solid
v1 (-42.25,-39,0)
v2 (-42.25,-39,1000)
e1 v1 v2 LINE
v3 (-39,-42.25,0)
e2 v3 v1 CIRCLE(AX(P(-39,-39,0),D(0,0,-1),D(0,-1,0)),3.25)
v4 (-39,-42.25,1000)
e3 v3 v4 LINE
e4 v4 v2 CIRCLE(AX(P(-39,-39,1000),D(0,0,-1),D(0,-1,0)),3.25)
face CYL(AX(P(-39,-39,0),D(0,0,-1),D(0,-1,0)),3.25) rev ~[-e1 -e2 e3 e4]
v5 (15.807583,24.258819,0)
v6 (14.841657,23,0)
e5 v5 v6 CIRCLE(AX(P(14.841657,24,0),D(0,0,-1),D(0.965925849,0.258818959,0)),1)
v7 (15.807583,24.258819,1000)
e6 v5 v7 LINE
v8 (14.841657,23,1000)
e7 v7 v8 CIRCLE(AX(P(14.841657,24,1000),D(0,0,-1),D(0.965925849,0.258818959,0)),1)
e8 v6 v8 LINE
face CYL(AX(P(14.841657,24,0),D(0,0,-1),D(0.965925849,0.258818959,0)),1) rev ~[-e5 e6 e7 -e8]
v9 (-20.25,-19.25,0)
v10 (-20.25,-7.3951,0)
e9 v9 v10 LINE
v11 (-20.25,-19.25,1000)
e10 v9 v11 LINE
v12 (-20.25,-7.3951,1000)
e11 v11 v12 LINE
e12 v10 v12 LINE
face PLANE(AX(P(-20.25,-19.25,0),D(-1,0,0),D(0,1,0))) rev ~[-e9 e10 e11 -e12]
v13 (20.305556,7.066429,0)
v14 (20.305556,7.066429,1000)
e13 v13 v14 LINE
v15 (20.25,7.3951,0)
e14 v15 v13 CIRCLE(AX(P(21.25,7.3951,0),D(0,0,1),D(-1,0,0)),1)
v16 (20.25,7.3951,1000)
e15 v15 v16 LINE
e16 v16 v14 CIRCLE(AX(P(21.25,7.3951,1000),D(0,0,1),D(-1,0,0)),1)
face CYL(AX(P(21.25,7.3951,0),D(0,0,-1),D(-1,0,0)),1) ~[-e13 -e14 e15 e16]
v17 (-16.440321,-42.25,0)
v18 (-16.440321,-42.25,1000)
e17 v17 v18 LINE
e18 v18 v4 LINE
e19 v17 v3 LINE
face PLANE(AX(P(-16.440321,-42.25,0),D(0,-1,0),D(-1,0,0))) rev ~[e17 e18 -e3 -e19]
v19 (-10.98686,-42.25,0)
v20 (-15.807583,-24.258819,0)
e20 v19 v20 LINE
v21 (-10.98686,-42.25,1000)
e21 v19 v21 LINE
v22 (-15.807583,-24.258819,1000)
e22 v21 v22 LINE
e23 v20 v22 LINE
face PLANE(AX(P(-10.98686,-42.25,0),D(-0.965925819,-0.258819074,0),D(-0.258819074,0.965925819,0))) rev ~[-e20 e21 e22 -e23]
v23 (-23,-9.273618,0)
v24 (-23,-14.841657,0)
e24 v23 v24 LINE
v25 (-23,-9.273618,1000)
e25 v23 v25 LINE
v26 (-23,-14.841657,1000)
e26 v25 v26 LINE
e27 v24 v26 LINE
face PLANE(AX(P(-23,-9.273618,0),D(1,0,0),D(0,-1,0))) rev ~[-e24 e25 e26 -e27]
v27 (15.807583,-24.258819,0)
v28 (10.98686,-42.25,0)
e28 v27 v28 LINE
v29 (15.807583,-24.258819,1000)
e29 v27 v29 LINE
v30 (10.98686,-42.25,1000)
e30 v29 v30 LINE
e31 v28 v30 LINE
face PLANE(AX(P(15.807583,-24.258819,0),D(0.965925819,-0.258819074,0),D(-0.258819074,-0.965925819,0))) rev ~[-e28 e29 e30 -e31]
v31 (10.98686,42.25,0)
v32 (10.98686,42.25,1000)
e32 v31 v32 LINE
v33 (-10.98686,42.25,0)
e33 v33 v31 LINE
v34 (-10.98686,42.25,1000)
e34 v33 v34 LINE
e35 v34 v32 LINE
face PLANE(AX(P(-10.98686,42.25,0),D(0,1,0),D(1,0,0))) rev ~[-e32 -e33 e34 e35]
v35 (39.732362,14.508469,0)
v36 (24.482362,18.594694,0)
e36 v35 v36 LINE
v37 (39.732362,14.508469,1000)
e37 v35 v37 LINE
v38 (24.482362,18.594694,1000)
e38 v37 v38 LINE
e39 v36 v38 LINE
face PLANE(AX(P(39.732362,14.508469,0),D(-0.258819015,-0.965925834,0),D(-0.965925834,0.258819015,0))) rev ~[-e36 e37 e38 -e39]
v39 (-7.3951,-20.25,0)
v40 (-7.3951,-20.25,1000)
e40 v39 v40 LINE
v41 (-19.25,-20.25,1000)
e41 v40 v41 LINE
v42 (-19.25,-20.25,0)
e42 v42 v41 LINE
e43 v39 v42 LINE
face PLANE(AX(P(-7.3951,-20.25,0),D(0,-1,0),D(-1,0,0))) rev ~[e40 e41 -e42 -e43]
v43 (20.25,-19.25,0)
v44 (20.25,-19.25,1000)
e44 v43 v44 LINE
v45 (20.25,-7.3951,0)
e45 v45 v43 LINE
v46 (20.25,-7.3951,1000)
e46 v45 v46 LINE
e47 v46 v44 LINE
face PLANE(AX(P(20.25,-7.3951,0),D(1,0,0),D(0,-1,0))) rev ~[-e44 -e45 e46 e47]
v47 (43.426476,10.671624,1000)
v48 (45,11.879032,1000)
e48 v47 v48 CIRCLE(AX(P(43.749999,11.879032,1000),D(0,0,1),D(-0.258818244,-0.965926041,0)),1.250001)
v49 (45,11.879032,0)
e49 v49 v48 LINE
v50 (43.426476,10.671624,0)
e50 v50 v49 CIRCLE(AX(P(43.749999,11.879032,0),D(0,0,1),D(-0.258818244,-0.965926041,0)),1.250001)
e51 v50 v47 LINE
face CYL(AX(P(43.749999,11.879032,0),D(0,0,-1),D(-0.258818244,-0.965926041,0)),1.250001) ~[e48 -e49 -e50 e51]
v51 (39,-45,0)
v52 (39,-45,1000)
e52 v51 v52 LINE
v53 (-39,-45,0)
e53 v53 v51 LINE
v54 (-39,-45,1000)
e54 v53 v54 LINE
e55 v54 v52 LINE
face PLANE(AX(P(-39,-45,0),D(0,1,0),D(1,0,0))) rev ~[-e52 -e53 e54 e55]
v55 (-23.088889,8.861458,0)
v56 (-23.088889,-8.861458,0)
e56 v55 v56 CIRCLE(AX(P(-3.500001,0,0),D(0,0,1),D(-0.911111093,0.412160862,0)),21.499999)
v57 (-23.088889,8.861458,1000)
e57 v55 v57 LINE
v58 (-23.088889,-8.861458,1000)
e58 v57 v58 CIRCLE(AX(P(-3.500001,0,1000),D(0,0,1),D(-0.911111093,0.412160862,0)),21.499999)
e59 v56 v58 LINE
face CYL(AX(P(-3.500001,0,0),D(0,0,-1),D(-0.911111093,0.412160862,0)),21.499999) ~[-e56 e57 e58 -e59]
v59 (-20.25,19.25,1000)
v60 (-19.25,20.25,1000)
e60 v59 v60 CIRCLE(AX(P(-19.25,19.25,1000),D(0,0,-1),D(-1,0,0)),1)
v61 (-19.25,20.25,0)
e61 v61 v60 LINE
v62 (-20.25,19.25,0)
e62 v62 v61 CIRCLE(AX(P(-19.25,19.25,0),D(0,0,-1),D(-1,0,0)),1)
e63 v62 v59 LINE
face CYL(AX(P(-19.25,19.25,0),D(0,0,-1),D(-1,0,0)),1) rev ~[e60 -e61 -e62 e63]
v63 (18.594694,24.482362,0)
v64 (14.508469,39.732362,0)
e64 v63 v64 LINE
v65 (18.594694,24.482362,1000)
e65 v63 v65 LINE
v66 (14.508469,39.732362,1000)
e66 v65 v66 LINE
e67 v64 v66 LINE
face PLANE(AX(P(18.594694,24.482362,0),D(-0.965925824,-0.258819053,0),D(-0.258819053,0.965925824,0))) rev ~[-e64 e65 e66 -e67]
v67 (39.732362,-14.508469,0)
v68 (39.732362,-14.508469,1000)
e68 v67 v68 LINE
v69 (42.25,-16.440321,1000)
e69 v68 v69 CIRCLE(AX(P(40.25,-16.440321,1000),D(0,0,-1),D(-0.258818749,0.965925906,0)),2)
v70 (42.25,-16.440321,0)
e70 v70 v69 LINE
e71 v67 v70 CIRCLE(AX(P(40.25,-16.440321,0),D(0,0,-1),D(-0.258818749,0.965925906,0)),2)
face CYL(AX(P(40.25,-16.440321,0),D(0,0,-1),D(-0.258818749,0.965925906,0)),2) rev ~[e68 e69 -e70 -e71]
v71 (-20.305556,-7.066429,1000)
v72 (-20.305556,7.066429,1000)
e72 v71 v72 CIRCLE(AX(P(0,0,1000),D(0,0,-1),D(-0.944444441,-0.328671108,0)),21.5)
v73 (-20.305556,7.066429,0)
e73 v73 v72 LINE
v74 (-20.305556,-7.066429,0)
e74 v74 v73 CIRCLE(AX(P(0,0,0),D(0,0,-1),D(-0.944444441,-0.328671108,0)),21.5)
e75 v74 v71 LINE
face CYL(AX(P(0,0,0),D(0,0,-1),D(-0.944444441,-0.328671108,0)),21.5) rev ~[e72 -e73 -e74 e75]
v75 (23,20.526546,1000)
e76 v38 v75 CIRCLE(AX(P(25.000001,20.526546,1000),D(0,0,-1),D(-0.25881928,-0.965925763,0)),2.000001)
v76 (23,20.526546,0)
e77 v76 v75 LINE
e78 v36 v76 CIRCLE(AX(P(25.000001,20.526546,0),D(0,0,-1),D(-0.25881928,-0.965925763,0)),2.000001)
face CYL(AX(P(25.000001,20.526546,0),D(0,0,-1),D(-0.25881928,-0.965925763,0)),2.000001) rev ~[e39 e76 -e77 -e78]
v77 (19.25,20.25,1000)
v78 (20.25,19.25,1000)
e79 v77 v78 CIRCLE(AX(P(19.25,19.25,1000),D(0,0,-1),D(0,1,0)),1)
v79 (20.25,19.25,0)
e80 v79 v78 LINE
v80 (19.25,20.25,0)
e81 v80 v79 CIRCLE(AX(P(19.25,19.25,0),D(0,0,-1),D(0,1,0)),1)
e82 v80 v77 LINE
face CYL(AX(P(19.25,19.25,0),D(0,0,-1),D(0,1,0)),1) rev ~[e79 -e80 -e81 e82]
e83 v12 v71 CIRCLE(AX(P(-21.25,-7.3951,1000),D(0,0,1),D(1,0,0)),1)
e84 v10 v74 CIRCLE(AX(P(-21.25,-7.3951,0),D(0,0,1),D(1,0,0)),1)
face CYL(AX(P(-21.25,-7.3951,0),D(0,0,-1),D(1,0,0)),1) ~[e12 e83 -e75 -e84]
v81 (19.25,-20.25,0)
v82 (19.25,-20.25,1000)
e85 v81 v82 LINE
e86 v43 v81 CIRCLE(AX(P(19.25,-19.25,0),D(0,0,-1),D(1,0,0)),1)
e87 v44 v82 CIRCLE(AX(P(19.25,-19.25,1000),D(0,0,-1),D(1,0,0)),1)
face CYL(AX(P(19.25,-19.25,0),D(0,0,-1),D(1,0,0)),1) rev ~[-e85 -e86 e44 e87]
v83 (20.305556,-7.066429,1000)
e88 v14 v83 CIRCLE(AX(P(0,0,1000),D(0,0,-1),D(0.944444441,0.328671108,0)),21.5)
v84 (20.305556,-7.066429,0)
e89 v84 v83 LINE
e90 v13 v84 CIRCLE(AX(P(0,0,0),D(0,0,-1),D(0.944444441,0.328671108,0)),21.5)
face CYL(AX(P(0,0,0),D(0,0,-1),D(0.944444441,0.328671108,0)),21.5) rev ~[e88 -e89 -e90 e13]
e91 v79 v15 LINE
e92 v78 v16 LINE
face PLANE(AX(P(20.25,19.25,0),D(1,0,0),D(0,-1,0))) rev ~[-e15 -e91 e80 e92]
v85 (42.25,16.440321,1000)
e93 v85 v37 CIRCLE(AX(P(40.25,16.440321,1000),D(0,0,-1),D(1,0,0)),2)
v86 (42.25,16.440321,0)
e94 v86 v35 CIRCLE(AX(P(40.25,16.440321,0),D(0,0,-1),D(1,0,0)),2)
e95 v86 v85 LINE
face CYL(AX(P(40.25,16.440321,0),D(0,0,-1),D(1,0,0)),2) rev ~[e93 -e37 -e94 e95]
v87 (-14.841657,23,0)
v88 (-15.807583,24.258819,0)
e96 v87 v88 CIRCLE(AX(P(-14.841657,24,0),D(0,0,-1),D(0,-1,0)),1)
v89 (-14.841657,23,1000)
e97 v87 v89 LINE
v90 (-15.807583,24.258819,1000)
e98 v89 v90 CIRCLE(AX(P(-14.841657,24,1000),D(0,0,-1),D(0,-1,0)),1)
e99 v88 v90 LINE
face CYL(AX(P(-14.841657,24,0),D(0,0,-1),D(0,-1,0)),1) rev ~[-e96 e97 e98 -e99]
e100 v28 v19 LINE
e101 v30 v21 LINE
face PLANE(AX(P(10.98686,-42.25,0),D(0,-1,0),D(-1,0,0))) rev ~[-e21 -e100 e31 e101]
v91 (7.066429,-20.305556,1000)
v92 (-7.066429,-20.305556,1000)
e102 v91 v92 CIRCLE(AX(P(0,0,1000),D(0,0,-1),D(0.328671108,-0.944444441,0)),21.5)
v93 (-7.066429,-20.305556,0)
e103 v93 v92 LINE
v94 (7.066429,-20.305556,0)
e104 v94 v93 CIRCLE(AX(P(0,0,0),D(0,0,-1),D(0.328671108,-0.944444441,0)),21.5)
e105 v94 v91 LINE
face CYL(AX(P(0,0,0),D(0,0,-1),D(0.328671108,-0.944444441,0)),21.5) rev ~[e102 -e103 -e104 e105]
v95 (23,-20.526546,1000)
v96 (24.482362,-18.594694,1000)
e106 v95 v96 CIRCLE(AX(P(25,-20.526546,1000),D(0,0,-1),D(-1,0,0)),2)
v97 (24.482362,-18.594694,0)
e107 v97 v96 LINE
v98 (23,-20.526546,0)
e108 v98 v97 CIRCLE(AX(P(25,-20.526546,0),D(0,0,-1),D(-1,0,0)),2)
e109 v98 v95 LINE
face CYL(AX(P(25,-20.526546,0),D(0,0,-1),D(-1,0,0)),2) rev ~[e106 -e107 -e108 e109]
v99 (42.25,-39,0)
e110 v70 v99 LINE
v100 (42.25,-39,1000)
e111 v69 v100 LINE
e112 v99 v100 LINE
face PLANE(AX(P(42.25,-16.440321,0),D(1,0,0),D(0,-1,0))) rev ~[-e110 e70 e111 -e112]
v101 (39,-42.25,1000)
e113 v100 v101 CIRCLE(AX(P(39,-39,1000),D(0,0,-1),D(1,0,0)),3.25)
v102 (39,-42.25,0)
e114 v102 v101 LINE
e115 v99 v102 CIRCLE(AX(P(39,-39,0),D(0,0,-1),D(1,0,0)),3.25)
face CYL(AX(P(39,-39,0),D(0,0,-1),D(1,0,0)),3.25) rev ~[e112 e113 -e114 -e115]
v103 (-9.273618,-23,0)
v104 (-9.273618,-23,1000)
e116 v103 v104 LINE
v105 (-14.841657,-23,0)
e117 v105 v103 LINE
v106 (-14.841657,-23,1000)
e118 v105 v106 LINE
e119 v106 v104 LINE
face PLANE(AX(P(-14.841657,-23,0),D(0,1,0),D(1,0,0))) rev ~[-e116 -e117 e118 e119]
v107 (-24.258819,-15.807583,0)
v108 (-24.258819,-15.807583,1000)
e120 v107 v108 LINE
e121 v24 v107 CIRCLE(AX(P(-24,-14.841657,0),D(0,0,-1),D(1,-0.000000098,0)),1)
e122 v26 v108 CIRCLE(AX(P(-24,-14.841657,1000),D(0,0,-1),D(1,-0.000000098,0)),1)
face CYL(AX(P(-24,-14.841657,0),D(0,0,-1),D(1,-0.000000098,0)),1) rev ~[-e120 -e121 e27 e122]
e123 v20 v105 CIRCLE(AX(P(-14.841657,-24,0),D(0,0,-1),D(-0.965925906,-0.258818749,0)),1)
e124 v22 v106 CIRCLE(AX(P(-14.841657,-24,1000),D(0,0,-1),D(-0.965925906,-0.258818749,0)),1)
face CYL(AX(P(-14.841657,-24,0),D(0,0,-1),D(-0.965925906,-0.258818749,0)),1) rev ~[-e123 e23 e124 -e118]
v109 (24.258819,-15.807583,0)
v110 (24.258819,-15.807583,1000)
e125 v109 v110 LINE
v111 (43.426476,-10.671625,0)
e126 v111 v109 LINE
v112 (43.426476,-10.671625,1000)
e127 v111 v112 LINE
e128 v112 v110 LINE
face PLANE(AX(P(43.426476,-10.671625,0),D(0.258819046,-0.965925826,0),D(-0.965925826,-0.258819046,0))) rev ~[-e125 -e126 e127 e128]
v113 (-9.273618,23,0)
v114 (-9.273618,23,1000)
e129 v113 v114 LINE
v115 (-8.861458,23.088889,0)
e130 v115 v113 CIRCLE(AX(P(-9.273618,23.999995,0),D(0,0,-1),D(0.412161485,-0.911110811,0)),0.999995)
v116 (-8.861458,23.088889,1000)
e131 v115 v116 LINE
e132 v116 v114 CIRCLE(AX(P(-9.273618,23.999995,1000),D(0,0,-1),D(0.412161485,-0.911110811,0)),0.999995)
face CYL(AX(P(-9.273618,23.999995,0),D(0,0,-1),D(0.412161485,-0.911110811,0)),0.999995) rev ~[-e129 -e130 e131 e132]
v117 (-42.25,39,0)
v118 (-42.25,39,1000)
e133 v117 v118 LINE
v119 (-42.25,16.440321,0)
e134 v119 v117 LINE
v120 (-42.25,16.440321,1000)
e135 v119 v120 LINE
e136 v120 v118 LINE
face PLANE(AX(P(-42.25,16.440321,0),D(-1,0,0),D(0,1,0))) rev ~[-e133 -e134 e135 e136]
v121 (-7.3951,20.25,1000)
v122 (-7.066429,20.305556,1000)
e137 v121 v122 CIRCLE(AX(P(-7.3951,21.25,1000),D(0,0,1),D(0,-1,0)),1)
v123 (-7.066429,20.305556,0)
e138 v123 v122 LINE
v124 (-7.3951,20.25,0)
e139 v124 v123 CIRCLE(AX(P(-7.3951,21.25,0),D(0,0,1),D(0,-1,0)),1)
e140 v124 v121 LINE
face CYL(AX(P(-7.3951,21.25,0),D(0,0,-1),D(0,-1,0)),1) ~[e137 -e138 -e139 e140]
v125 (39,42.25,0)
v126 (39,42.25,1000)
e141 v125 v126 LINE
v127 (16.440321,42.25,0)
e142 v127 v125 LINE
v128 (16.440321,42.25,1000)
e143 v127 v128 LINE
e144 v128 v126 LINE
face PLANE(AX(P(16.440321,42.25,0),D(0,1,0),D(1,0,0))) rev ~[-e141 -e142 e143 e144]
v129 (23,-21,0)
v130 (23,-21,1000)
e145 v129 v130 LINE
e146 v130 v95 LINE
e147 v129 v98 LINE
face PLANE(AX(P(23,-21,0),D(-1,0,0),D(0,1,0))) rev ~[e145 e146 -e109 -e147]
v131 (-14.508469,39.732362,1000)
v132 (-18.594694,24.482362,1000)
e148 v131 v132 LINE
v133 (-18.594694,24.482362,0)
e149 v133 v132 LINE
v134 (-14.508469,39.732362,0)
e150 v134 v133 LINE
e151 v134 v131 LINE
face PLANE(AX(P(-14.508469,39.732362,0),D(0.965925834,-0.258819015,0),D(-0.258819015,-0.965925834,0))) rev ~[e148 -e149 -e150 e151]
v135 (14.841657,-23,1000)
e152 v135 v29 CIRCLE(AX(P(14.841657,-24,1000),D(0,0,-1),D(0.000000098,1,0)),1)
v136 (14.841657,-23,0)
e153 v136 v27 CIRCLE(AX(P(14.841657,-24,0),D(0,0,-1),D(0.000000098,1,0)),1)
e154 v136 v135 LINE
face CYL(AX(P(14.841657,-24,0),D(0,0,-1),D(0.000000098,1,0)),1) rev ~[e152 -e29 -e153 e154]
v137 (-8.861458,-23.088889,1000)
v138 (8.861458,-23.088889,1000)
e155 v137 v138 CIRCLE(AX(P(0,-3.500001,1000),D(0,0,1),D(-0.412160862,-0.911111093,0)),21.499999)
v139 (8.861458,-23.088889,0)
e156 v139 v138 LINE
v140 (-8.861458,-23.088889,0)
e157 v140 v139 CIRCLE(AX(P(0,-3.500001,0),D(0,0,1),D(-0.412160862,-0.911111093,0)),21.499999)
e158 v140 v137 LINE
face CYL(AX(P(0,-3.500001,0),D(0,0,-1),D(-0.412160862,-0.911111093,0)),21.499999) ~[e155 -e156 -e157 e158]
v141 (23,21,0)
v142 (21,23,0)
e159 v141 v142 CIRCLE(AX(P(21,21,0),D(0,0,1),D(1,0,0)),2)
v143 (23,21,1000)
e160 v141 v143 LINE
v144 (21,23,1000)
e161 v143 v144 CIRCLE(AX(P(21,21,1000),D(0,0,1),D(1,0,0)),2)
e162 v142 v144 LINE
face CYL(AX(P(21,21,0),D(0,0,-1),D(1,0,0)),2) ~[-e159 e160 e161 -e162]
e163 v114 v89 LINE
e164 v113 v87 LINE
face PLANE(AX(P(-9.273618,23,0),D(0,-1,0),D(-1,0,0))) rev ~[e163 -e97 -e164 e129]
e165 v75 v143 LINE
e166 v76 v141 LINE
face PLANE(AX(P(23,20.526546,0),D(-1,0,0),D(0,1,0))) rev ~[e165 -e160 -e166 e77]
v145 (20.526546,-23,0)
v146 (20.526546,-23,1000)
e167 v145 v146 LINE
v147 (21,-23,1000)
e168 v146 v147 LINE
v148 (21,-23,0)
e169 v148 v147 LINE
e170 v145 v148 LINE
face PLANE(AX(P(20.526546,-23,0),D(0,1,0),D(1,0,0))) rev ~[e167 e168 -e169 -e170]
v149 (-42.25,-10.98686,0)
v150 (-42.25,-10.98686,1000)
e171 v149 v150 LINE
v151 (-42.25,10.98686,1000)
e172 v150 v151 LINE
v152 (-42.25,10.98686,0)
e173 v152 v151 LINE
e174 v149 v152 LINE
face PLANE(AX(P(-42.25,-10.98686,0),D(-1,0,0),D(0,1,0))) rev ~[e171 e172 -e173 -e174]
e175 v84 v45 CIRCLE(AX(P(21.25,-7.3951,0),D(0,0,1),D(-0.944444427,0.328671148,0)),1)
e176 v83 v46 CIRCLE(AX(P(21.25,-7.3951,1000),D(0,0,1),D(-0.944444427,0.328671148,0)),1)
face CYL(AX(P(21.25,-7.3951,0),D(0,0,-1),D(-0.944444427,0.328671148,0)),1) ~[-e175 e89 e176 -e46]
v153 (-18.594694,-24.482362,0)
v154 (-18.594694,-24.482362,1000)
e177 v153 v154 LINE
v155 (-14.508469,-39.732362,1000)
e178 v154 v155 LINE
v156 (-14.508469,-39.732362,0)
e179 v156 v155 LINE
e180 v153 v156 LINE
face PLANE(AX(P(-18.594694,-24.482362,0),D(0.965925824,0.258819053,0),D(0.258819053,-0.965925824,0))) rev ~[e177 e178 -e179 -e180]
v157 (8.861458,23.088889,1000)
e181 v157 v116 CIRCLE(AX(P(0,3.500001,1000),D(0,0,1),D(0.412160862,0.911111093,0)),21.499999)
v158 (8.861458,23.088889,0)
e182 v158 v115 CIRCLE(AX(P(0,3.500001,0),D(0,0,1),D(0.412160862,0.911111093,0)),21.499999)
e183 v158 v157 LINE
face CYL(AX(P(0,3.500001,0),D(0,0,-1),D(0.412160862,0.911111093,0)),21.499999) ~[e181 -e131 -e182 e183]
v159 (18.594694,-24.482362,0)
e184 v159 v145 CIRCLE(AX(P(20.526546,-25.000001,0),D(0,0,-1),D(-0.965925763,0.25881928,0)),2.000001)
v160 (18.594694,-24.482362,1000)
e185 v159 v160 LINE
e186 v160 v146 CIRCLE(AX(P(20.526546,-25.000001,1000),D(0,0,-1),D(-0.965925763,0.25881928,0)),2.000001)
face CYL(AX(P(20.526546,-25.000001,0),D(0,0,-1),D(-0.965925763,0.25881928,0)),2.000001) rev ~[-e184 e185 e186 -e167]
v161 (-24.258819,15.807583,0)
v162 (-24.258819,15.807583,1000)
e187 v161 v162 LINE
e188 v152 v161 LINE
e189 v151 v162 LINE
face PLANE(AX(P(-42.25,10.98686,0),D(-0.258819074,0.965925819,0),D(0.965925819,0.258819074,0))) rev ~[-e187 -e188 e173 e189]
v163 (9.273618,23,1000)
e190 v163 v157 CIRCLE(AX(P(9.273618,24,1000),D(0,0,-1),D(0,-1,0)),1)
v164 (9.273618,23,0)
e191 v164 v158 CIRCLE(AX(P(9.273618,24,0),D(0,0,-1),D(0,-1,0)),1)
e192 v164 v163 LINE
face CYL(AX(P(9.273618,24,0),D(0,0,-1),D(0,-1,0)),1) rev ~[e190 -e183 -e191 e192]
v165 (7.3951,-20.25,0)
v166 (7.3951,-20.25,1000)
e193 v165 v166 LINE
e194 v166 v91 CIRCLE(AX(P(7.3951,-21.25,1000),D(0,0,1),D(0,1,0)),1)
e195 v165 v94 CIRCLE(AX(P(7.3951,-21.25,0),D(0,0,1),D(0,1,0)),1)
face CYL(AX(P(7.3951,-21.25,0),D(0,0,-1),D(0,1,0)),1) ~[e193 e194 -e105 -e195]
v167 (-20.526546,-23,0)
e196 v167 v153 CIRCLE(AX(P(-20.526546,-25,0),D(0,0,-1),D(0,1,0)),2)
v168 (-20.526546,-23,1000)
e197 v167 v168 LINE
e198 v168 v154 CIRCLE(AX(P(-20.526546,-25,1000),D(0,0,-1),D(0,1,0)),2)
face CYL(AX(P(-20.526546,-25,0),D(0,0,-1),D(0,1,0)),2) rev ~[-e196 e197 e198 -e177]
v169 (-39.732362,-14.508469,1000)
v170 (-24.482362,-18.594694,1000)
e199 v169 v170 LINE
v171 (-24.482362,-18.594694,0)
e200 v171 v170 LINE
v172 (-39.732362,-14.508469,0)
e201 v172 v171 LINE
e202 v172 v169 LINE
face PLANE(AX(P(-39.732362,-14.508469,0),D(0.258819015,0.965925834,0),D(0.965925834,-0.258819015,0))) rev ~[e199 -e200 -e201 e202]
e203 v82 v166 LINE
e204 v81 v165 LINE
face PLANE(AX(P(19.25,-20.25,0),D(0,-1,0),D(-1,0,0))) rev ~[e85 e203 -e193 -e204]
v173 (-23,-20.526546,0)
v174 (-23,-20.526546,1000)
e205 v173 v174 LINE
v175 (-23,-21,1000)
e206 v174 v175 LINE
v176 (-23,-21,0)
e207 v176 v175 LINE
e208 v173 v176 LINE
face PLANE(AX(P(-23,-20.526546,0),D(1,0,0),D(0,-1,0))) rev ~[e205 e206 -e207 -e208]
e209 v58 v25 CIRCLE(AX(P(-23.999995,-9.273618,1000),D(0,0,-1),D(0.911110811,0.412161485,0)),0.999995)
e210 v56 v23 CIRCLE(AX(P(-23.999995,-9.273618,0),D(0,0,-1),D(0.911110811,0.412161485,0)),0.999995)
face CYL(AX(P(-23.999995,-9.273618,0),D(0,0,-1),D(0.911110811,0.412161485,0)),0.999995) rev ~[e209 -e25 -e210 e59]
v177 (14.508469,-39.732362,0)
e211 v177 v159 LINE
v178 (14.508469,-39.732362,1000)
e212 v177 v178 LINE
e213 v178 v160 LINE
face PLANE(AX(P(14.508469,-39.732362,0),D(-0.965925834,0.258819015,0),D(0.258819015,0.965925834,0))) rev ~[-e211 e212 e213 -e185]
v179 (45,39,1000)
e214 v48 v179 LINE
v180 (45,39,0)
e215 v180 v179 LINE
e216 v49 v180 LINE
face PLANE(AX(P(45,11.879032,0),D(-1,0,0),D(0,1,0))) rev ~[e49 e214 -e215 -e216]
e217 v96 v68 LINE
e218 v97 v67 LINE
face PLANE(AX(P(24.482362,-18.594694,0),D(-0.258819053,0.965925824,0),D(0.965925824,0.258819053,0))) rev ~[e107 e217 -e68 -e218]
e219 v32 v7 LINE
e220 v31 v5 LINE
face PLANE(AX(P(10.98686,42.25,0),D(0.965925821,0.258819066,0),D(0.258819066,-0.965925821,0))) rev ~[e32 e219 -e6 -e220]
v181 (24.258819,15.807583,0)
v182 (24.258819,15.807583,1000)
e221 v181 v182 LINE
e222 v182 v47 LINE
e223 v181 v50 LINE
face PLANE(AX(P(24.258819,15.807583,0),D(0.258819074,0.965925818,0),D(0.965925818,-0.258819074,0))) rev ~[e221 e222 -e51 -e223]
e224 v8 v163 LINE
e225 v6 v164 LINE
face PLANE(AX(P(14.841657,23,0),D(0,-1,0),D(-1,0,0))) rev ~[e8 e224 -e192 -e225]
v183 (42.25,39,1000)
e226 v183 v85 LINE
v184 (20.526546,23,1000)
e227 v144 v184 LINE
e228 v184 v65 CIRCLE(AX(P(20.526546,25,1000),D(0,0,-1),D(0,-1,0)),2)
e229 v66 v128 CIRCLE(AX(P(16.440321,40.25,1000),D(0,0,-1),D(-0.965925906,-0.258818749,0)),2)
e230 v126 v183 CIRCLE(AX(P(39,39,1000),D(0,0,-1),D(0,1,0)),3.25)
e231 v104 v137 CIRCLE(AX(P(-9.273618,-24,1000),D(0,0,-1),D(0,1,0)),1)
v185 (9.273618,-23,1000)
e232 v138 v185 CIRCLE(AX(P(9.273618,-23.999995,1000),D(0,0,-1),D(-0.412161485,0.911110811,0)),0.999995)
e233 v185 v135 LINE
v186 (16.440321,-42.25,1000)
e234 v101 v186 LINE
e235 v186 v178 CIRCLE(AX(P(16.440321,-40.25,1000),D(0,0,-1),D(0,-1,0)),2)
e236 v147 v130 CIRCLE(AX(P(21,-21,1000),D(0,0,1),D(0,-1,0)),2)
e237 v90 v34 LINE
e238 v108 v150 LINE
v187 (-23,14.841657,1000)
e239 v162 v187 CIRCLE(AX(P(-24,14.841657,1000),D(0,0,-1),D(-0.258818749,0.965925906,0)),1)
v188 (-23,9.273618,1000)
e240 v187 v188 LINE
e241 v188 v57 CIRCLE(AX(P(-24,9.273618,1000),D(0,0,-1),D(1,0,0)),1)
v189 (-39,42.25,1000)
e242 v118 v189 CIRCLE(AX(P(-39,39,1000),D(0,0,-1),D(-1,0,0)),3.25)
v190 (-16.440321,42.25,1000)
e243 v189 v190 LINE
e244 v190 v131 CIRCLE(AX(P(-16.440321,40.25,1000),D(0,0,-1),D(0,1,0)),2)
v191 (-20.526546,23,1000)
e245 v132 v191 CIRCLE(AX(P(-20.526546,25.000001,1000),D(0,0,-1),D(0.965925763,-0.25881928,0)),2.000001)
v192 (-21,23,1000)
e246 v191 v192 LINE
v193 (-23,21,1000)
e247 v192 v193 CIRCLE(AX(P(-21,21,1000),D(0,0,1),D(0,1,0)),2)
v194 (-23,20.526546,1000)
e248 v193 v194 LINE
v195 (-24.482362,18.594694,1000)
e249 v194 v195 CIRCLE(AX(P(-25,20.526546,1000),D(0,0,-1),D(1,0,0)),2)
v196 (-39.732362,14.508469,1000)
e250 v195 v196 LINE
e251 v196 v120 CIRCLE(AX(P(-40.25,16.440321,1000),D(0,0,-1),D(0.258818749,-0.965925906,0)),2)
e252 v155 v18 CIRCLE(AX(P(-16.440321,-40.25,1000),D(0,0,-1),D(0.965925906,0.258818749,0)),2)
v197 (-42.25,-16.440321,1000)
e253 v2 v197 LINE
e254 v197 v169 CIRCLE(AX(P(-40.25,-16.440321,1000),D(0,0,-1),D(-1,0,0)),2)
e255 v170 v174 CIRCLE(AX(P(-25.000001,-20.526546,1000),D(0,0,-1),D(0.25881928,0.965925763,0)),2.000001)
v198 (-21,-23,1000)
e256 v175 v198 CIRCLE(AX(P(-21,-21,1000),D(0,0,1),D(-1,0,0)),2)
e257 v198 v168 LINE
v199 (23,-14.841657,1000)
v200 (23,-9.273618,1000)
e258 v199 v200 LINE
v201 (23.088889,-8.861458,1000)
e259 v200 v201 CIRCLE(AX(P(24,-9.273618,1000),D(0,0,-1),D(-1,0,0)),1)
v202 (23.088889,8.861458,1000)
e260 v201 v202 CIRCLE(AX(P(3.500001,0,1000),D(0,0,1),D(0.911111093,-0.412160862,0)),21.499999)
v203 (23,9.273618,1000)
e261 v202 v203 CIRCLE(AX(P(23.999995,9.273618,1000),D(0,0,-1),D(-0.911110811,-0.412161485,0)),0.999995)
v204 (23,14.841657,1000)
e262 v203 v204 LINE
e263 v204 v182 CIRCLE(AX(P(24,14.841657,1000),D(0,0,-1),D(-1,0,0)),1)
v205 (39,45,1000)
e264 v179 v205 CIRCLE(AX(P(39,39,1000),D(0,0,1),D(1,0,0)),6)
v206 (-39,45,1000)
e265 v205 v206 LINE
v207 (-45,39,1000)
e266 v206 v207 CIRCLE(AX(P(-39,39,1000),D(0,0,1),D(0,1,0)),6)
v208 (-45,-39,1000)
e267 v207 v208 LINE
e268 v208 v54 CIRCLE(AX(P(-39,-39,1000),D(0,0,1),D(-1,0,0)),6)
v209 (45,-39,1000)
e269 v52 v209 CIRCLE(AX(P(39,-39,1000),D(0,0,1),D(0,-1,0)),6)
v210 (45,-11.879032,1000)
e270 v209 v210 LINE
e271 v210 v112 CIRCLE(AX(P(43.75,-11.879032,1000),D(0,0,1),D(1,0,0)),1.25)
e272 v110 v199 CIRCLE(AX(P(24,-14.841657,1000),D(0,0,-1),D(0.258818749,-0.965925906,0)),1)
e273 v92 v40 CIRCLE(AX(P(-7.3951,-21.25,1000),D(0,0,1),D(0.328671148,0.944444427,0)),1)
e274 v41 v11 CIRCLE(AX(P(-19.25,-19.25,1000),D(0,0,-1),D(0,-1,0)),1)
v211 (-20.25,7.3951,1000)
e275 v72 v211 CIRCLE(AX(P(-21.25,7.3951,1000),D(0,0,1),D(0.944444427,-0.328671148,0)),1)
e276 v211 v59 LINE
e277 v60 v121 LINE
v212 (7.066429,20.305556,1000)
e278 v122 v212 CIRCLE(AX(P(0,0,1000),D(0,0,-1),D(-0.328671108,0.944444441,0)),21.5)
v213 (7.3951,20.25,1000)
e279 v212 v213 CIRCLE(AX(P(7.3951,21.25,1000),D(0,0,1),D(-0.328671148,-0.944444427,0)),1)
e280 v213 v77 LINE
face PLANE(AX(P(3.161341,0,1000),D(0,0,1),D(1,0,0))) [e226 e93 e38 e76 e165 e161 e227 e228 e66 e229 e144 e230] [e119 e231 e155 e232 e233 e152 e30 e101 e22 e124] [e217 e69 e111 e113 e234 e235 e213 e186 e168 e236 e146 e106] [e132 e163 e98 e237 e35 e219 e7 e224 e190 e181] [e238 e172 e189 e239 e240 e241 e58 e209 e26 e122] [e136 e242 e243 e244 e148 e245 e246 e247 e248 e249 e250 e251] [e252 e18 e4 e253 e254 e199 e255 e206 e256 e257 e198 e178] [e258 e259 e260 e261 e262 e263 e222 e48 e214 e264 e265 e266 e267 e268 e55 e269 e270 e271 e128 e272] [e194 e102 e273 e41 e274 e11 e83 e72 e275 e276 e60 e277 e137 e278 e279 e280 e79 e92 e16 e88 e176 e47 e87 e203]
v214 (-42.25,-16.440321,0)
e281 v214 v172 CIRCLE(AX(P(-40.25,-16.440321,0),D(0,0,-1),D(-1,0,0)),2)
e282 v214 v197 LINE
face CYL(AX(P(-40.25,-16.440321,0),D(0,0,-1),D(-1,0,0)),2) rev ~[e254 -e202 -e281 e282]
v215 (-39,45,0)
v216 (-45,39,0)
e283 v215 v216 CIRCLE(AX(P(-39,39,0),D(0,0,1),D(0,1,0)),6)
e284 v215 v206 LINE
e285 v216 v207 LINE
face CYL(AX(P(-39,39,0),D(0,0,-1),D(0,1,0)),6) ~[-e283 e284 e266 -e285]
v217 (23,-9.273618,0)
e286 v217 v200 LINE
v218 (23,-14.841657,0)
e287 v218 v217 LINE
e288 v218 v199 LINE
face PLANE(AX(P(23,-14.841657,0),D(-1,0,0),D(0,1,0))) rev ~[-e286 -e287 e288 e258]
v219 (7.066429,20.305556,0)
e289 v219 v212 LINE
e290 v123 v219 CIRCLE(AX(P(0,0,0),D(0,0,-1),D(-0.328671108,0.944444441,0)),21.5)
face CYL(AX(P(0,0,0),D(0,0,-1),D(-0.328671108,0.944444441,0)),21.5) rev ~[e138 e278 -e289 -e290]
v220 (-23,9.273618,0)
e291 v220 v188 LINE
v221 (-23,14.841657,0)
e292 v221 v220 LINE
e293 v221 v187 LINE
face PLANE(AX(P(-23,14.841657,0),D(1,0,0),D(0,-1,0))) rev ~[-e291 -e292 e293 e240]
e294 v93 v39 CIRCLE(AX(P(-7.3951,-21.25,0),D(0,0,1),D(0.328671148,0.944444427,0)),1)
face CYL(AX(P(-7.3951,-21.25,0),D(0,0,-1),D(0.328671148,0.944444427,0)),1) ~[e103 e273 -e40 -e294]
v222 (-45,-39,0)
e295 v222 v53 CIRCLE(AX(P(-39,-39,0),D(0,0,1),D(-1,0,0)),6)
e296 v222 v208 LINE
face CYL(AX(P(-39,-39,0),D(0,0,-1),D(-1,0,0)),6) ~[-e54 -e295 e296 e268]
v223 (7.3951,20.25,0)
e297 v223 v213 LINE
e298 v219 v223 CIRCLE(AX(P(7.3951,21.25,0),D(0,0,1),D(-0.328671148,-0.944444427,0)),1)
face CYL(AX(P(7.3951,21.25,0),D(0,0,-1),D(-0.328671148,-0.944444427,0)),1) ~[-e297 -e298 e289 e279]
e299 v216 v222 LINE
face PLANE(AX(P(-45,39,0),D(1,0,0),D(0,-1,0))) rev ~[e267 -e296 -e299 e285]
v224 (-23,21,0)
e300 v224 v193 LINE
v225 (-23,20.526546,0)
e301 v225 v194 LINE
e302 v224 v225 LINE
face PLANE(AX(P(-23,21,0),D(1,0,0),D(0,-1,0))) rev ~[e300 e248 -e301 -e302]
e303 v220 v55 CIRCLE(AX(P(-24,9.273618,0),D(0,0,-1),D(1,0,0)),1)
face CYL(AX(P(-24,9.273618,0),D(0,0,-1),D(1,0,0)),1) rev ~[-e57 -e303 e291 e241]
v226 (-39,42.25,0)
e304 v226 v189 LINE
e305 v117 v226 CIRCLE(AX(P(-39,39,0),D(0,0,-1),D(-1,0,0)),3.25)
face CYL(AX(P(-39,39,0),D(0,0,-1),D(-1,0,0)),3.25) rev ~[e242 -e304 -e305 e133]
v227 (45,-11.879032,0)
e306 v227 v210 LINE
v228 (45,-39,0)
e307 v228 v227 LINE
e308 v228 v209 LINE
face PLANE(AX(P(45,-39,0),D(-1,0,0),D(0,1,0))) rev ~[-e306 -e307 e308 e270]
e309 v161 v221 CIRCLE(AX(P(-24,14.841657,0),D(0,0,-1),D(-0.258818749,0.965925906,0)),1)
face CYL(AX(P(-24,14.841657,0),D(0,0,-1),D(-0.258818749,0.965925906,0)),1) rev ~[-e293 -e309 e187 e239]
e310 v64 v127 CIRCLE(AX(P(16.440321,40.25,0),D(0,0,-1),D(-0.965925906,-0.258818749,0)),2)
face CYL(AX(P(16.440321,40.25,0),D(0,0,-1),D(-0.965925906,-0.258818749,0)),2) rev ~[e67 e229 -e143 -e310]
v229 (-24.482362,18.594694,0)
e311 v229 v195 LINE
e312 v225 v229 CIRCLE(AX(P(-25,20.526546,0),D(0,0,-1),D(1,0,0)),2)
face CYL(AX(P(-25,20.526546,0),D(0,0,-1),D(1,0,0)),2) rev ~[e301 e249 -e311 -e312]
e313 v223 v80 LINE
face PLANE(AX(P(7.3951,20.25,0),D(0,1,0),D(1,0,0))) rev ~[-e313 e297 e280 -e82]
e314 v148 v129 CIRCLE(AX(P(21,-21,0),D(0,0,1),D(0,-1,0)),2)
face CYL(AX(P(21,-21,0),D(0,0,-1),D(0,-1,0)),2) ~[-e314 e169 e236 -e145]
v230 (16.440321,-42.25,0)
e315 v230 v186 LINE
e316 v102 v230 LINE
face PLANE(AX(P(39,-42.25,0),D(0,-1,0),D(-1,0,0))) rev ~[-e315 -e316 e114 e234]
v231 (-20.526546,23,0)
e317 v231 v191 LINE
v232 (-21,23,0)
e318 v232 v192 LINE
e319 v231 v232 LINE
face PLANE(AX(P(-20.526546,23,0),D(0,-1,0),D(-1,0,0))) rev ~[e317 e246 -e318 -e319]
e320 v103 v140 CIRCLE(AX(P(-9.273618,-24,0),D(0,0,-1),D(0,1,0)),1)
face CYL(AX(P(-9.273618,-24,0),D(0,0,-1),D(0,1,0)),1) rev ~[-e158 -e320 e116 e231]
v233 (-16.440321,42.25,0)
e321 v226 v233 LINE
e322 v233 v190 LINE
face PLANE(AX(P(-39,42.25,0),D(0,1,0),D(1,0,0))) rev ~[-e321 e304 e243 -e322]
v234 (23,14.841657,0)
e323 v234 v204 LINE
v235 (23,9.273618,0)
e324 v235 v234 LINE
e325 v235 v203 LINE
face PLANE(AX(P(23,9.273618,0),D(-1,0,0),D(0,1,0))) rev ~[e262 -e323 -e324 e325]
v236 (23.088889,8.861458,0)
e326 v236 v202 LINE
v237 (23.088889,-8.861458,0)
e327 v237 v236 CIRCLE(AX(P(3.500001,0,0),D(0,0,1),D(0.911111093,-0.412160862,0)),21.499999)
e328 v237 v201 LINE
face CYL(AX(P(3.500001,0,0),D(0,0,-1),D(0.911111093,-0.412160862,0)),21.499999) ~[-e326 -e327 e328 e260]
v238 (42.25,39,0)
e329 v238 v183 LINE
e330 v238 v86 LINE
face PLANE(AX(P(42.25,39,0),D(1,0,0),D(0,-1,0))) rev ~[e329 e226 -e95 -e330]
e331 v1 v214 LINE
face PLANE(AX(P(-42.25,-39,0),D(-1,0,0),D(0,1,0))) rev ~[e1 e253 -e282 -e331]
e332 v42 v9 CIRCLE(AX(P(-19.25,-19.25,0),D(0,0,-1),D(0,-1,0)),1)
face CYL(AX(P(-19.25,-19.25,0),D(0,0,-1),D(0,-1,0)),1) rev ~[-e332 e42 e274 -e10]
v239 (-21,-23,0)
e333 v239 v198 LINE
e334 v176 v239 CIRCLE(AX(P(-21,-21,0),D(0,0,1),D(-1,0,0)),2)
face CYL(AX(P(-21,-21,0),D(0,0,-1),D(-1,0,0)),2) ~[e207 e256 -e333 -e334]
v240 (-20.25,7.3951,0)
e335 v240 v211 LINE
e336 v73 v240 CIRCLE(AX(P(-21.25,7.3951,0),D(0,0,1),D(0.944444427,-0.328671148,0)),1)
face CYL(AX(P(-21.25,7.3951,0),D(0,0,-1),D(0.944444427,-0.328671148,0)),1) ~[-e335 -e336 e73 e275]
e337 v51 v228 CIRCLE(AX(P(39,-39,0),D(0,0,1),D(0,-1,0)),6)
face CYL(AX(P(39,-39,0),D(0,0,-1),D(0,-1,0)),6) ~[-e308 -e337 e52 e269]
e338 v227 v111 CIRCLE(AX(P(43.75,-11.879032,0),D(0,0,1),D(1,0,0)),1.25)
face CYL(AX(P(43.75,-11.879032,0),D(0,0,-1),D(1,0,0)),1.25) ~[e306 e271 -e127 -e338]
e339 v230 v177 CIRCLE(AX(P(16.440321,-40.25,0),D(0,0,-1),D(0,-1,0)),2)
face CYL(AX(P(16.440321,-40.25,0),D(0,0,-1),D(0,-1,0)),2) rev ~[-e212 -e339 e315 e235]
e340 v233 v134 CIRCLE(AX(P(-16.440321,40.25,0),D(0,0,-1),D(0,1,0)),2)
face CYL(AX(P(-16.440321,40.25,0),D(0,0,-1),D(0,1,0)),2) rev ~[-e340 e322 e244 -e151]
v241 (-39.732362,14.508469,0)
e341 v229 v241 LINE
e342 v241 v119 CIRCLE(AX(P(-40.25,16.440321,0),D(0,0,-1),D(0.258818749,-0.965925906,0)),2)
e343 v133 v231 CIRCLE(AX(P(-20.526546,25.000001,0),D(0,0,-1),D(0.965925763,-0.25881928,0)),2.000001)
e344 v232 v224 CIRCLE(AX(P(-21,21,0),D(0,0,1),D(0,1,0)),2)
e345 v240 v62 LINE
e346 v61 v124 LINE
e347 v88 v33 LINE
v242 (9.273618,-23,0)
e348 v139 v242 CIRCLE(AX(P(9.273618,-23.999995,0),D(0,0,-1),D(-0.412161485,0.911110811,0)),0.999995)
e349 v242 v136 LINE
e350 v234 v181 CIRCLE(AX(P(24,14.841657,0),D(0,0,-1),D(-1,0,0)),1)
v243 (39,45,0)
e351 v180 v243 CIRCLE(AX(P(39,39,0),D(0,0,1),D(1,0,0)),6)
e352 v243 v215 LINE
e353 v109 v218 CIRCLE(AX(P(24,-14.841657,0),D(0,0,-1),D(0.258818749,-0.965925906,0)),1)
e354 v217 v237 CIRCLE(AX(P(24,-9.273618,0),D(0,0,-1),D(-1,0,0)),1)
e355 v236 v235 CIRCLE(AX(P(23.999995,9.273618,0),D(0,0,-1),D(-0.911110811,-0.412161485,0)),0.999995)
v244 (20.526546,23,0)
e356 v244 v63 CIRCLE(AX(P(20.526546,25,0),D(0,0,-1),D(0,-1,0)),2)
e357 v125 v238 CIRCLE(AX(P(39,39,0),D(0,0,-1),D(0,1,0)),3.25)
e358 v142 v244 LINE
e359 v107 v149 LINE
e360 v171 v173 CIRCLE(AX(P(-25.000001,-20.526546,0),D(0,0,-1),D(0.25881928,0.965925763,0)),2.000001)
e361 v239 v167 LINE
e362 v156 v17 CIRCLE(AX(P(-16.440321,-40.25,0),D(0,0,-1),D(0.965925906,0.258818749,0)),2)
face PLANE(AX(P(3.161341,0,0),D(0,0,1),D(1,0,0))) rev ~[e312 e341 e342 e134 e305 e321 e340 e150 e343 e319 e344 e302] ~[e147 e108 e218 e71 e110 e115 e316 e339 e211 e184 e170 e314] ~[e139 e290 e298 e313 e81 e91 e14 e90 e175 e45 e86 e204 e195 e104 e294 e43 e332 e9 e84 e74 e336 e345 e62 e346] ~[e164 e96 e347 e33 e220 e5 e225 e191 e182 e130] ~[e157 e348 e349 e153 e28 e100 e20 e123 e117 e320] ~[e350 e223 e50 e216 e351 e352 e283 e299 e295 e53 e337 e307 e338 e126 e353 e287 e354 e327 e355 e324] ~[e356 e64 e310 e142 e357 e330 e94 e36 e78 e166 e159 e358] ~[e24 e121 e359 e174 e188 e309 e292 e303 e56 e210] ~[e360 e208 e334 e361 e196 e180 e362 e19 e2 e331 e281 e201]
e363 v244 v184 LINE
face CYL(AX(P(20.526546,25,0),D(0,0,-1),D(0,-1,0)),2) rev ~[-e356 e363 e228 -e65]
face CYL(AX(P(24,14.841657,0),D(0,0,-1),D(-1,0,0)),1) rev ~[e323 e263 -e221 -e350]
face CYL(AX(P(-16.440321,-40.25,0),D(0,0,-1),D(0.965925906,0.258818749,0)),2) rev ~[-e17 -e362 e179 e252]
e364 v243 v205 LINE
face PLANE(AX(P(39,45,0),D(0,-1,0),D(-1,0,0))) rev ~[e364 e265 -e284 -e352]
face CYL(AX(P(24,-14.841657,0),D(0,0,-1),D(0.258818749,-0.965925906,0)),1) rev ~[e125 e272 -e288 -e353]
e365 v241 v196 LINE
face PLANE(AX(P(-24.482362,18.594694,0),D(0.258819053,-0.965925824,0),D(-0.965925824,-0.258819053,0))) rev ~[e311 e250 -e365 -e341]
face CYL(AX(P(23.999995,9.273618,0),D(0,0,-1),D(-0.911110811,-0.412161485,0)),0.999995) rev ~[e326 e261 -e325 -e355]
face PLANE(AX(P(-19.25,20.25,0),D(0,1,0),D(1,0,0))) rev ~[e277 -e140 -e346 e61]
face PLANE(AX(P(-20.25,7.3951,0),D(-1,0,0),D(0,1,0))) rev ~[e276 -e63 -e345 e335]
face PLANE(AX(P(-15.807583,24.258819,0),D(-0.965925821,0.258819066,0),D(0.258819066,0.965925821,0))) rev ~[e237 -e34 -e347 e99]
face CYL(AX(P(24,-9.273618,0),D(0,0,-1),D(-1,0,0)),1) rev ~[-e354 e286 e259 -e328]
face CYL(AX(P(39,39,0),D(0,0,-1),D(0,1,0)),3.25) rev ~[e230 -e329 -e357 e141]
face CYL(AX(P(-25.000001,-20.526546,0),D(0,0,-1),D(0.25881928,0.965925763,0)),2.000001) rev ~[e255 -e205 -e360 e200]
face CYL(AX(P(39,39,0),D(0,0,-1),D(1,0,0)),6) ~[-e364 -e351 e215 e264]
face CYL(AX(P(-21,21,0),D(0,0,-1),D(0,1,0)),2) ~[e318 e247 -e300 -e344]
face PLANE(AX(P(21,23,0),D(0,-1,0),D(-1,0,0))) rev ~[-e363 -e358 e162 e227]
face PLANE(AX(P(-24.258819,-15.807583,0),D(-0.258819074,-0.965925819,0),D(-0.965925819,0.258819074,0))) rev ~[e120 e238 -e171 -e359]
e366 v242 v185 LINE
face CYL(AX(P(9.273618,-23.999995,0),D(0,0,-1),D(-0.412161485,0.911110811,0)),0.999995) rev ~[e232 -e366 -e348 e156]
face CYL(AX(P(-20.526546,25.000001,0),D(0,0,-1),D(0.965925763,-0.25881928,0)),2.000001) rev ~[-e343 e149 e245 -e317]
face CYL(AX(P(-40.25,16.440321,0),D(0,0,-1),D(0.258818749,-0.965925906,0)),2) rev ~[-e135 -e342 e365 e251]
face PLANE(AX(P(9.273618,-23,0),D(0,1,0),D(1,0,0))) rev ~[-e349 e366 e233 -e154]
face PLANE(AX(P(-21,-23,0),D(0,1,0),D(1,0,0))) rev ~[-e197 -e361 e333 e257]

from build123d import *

# Parameters (mm, degrees)
F1_DEPTH = 1000


# Not quite as in the source:
# - ends of sketch curves that miss each other by under 0.0002 mm in the source are joined


with BuildPart() as f1:
    # F0 (on Top) → F1 (new body)
    with BuildSketch(Plane.XY):
        with BuildLine():
            Line((23, 9.273618), (23, 14.841657))
            ThreePointArc((23, 14.841657), (23.3912385359, 15.6350103133), (24.2588189596, 15.8075828492))
            Line((24.2588189596, 15.8075828492), (43.426476, 10.671624))
            ThreePointArc((43.426476, 10.671624), (44.5109517857, 10.8873403242), (45, 11.879032))
            Line((45, 11.879032), (45, 39))
            ThreePointArc((45, 39), (43.2426406871, 43.2426406871), (39, 45))
            Line((39, 45), (-39, 45))
            ThreePointArc((-39, 45), (-43.2426406871, 43.2426406871), (-45, 39))
            Line((-45, 39), (-45, -39))
            ThreePointArc((-45, -39), (-43.2426406871, -43.2426406871), (-39, -45))
            Line((-39, -45), (39, -45))
            ThreePointArc((39, -45), (43.2426406871, -43.2426406871), (45, -39))
            Line((45, -39), (45, -11.879032))
            ThreePointArc((45, -11.879032), (44.5109517857, -10.8873403242), (43.4264761923, -10.6716247175))
            Line((43.4264761923, -10.6716247175), (24.258819, -15.807583))
            ThreePointArc((24.258819, -15.807583), (23.3912385359, -15.6350103133), (23, -14.841657))
            Line((23, -14.841657), (23, -9.273618))
            ThreePointArc((23, -9.273618), (23.022474706, -9.062799833), (23.0888885991, -8.8614578186))
            ThreePointArc((23.0888885991, -8.8614578186), (25, 0), (23.0888887851, 8.8614579028))
            ThreePointArc((23.0888887851, 8.8614579028), (23.022474706, 9.062799833), (23, 9.273618))
        make_face()
        with BuildLine():
            Line((15.807583, -24.258819), (10.98686, -42.25))
            Line((10.98686, -42.25), (-10.98686, -42.25))
            Line((-10.98686, -42.25), (-15.807583, -24.258819))
            ThreePointArc((-15.807583, -24.258819), (-15.6350103133, -23.3912385359), (-14.841657, -23))
            Line((-14.841657, -23), (-9.273618, -23))
            ThreePointArc((-9.273618, -23), (-9.062799833, -23.022474706), (-8.8614578186, -23.0888885991))
            ThreePointArc((-8.8614578186, -23.0888885991), (0, -25), (8.8614579028, -23.0888887851))
            ThreePointArc((8.8614579028, -23.0888887851), (9.062799833, -23.022474706), (9.273618, -23))
            Line((9.273618, -23), (14.841657, -23))
            ThreePointArc((14.841657, -23), (15.6350103133, -23.3912385359), (15.807583, -24.258819))
        make_face(mode=Mode.SUBTRACT)
        with BuildLine():
            ThreePointArc((-42.25, -16.440321), (-41.4675229282, -14.8536143733), (-39.7323620808, -14.5084693016))
            Line((-39.7323620808, -14.5084693016), (-24.482362, -18.594694))
            ThreePointArc((-24.482362, -18.594694), (-23.4132933733, -19.3090230718), (-23, -20.526546))
            Line((-23, -20.526546), (-23, -21))
            ThreePointArc((-23, -21), (-22.4142135624, -22.4142135624), (-21, -23))
            Line((-21, -23), (-20.526546, -23))
            ThreePointArc((-20.526546, -23), (-19.3090230718, -23.4132933733), (-18.5946943016, -24.4823620808))
            Line((-18.5946943016, -24.4823620808), (-14.508469, -39.732362))
            ThreePointArc((-14.508469, -39.732362), (-14.8536143733, -41.4675229282), (-16.440321, -42.25))
            Line((-16.440321, -42.25), (-39, -42.25))
            ThreePointArc((-39, -42.25), (-41.2980970389, -41.2980970389), (-42.25, -39))
            Line((-42.25, -39), (-42.25, -16.440321))
        make_face(mode=Mode.SUBTRACT)
        with BuildLine():
            ThreePointArc((16.440321, -42.25), (14.8536143733, -41.4675229282), (14.5084693016, -39.7323620808))
            Line((14.5084693016, -39.7323620808), (18.594694, -24.482362))
            ThreePointArc((18.594694, -24.482362), (19.3090230718, -23.4132933733), (20.526546, -23))
            Line((20.526546, -23), (21, -23))
            ThreePointArc((21, -23), (22.4142135624, -22.4142135624), (23, -21))
            Line((23, -21), (23, -20.526546))
            ThreePointArc((23, -20.526546), (23.4132933733, -19.3090230718), (24.4823620808, -18.5946943016))
            Line((24.4823620808, -18.5946943016), (39.732362, -14.508469))
            ThreePointArc((39.732362, -14.508469), (41.4675229282, -14.8536143733), (42.25, -16.440321))
            Line((42.25, -16.440321), (42.25, -39))
            ThreePointArc((42.25, -39), (41.2980970389, -41.2980970389), (39, -42.25))
            Line((39, -42.25), (16.440321, -42.25))
        make_face(mode=Mode.SUBTRACT)
        with BuildLine():
            Line((-24.258819, -15.807583), (-42.25, -10.98686))
            Line((-42.25, -10.98686), (-42.25, 10.98686))
            Line((-42.25, 10.98686), (-24.258819, 15.807583))
            ThreePointArc((-24.258819, 15.807583), (-23.3912385359, 15.6350103133), (-23, 14.841657))
            Line((-23, 14.841657), (-23, 9.273618))
            ThreePointArc((-23, 9.273618), (-23.022474706, 9.062799833), (-23.0888885991, 8.8614578186))
            ThreePointArc((-23.0888885991, 8.8614578186), (-25, 0), (-23.0888887851, -8.8614579028))
            ThreePointArc((-23.0888887851, -8.8614579028), (-23.022474706, -9.062799833), (-23, -9.273618))
            Line((-23, -9.273618), (-23, -14.841657))
            ThreePointArc((-23, -14.841657), (-23.3912385359, -15.6350103133), (-24.258819, -15.807583))
        make_face(mode=Mode.SUBTRACT)
        with BuildLine():
            ThreePointArc((19.25, 20.25), (19.9571067812, 19.9571067812), (20.25, 19.25))
            Line((20.25, 19.25), (20.25, 7.3951))
            ThreePointArc((20.25, 7.3951), (20.2639867072, 7.2284333074), (20.3055555728, 7.0664288513))
            ThreePointArc((20.3055554887, 7.066428822), (21.5, 0), (20.3055554887, -7.066428822))
            ThreePointArc((20.3055555728, -7.0664288513), (20.2639867072, -7.2284333074), (20.25, -7.3951))
            Line((20.25, -7.3951), (20.25, -19.25))
            ThreePointArc((20.25, -19.25), (19.9571067812, -19.9571067812), (19.25, -20.25))
            Line((19.25, -20.25), (7.3951, -20.25))
            ThreePointArc((7.3951, -20.25), (7.2284333074, -20.2639867072), (7.0664288513, -20.3055555728))
            ThreePointArc((7.066428822, -20.3055554887), (0, -21.5), (-7.066428822, -20.3055554887))
            ThreePointArc((-7.0664288513, -20.3055555728), (-7.2284333074, -20.2639867072), (-7.3951, -20.25))
            Line((-7.3951, -20.25), (-19.25, -20.25))
            ThreePointArc((-19.25, -20.25), (-19.9571067812, -19.9571067812), (-20.25, -19.25))
            Line((-20.25, -19.25), (-20.25, -7.3951))
            ThreePointArc((-20.25, -7.3951), (-20.2639867072, -7.2284333074), (-20.3055555728, -7.0664288513))
            ThreePointArc((-20.3055554887, -7.066428822), (-21.5, 0), (-20.3055554887, 7.066428822))
            ThreePointArc((-20.3055555728, 7.0664288513), (-20.2639867072, 7.2284333074), (-20.25, 7.3951))
            Line((-20.25, 7.3951), (-20.25, 19.25))
            ThreePointArc((-20.25, 19.25), (-19.9571067812, 19.9571067812), (-19.25, 20.25))
            Line((-19.25, 20.25), (-7.3951, 20.25))
            ThreePointArc((-7.3951, 20.25), (-7.2284333074, 20.2639867072), (-7.0664288513, 20.3055555728))
            ThreePointArc((-7.066428822, 20.3055554887), (0, 21.5), (7.066428822, 20.3055554887))
            ThreePointArc((7.0664288513, 20.3055555728), (7.2284333074, 20.2639867072), (7.3951, 20.25))
            Line((7.3951, 20.25), (19.25, 20.25))
        make_face(mode=Mode.SUBTRACT)
        with BuildLine():
            ThreePointArc((-16.440321, 42.25), (-14.8536143733, 41.4675229282), (-14.5084693016, 39.7323620808))
            Line((-14.5084693016, 39.7323620808), (-18.594694, 24.482362))
            ThreePointArc((-18.594694, 24.482362), (-19.3090230718, 23.4132933733), (-20.526546, 23))
            Line((-20.526546, 23), (-21, 23))
            ThreePointArc((-21, 23), (-22.4142135624, 22.4142135624), (-23, 21))
            Line((-23, 21), (-23, 20.526546))
            ThreePointArc((-23, 20.526546), (-23.4132933733, 19.3090230718), (-24.4823620808, 18.5946943016))
            Line((-24.4823620808, 18.5946943016), (-39.732362, 14.508469))
            ThreePointArc((-39.732362, 14.508469), (-41.4675229282, 14.8536143733), (-42.25, 16.440321))
            Line((-42.25, 16.440321), (-42.25, 39))
            ThreePointArc((-42.25, 39), (-41.2980970389, 41.2980970389), (-39, 42.25))
            Line((-39, 42.25), (-16.440321, 42.25))
        make_face(mode=Mode.SUBTRACT)
        with BuildLine():
            ThreePointArc((15.8075828492, 24.2588189596), (15.6350103133, 23.3912385359), (14.841657, 23))
            Line((14.841657, 23), (9.273618, 23))
            ThreePointArc((9.273618, 23), (9.062799833, 23.022474706), (8.8614578186, 23.0888885991))
            ThreePointArc((8.8614578186, 23.0888885991), (0, 25), (-8.8614579028, 23.0888887851))
            ThreePointArc((-8.8614579028, 23.0888887851), (-9.062799833, 23.022474706), (-9.273618, 23))
            Line((-9.273618, 23), (-14.841657, 23))
            ThreePointArc((-14.841657, 23), (-15.6350103133, 23.3912385359), (-15.8075828492, 24.2588189596))
            Line((-15.8075828492, 24.2588189596), (-10.98686, 42.25))
            Line((-10.98686, 42.25), (10.98686, 42.25))
            Line((10.98686, 42.25), (15.8075828492, 24.2588189596))
        make_face(mode=Mode.SUBTRACT)
        with BuildLine():
            ThreePointArc((42.25, 16.440321), (41.4675229282, 14.8536143733), (39.7323620808, 14.5084693016))
            Line((39.7323620808, 14.5084693016), (24.482362, 18.594694))
            ThreePointArc((24.482362, 18.594694), (23.4132933733, 19.3090230718), (23, 20.526546))
            Line((23, 20.526546), (23, 21))
            ThreePointArc((23, 21), (22.4142135624, 22.4142135624), (21, 23))
            Line((21, 23), (20.526546, 23))
            ThreePointArc((20.526546, 23), (19.3090230718, 23.4132933733), (18.5946943016, 24.4823620808))
            Line((18.5946943016, 24.4823620808), (14.508469, 39.732362))
            ThreePointArc((14.508469, 39.732362), (14.8536143733, 41.4675229282), (16.440321, 42.25))
            Line((16.440321, 42.25), (39, 42.25))
            ThreePointArc((39, 42.25), (41.2980970389, 41.2980970389), (42.25, 39))
            Line((42.25, 39), (42.25, 16.440321))
        make_face(mode=Mode.SUBTRACT)
    extrude(amount=F1_DEPTH)


solid = f1.part
